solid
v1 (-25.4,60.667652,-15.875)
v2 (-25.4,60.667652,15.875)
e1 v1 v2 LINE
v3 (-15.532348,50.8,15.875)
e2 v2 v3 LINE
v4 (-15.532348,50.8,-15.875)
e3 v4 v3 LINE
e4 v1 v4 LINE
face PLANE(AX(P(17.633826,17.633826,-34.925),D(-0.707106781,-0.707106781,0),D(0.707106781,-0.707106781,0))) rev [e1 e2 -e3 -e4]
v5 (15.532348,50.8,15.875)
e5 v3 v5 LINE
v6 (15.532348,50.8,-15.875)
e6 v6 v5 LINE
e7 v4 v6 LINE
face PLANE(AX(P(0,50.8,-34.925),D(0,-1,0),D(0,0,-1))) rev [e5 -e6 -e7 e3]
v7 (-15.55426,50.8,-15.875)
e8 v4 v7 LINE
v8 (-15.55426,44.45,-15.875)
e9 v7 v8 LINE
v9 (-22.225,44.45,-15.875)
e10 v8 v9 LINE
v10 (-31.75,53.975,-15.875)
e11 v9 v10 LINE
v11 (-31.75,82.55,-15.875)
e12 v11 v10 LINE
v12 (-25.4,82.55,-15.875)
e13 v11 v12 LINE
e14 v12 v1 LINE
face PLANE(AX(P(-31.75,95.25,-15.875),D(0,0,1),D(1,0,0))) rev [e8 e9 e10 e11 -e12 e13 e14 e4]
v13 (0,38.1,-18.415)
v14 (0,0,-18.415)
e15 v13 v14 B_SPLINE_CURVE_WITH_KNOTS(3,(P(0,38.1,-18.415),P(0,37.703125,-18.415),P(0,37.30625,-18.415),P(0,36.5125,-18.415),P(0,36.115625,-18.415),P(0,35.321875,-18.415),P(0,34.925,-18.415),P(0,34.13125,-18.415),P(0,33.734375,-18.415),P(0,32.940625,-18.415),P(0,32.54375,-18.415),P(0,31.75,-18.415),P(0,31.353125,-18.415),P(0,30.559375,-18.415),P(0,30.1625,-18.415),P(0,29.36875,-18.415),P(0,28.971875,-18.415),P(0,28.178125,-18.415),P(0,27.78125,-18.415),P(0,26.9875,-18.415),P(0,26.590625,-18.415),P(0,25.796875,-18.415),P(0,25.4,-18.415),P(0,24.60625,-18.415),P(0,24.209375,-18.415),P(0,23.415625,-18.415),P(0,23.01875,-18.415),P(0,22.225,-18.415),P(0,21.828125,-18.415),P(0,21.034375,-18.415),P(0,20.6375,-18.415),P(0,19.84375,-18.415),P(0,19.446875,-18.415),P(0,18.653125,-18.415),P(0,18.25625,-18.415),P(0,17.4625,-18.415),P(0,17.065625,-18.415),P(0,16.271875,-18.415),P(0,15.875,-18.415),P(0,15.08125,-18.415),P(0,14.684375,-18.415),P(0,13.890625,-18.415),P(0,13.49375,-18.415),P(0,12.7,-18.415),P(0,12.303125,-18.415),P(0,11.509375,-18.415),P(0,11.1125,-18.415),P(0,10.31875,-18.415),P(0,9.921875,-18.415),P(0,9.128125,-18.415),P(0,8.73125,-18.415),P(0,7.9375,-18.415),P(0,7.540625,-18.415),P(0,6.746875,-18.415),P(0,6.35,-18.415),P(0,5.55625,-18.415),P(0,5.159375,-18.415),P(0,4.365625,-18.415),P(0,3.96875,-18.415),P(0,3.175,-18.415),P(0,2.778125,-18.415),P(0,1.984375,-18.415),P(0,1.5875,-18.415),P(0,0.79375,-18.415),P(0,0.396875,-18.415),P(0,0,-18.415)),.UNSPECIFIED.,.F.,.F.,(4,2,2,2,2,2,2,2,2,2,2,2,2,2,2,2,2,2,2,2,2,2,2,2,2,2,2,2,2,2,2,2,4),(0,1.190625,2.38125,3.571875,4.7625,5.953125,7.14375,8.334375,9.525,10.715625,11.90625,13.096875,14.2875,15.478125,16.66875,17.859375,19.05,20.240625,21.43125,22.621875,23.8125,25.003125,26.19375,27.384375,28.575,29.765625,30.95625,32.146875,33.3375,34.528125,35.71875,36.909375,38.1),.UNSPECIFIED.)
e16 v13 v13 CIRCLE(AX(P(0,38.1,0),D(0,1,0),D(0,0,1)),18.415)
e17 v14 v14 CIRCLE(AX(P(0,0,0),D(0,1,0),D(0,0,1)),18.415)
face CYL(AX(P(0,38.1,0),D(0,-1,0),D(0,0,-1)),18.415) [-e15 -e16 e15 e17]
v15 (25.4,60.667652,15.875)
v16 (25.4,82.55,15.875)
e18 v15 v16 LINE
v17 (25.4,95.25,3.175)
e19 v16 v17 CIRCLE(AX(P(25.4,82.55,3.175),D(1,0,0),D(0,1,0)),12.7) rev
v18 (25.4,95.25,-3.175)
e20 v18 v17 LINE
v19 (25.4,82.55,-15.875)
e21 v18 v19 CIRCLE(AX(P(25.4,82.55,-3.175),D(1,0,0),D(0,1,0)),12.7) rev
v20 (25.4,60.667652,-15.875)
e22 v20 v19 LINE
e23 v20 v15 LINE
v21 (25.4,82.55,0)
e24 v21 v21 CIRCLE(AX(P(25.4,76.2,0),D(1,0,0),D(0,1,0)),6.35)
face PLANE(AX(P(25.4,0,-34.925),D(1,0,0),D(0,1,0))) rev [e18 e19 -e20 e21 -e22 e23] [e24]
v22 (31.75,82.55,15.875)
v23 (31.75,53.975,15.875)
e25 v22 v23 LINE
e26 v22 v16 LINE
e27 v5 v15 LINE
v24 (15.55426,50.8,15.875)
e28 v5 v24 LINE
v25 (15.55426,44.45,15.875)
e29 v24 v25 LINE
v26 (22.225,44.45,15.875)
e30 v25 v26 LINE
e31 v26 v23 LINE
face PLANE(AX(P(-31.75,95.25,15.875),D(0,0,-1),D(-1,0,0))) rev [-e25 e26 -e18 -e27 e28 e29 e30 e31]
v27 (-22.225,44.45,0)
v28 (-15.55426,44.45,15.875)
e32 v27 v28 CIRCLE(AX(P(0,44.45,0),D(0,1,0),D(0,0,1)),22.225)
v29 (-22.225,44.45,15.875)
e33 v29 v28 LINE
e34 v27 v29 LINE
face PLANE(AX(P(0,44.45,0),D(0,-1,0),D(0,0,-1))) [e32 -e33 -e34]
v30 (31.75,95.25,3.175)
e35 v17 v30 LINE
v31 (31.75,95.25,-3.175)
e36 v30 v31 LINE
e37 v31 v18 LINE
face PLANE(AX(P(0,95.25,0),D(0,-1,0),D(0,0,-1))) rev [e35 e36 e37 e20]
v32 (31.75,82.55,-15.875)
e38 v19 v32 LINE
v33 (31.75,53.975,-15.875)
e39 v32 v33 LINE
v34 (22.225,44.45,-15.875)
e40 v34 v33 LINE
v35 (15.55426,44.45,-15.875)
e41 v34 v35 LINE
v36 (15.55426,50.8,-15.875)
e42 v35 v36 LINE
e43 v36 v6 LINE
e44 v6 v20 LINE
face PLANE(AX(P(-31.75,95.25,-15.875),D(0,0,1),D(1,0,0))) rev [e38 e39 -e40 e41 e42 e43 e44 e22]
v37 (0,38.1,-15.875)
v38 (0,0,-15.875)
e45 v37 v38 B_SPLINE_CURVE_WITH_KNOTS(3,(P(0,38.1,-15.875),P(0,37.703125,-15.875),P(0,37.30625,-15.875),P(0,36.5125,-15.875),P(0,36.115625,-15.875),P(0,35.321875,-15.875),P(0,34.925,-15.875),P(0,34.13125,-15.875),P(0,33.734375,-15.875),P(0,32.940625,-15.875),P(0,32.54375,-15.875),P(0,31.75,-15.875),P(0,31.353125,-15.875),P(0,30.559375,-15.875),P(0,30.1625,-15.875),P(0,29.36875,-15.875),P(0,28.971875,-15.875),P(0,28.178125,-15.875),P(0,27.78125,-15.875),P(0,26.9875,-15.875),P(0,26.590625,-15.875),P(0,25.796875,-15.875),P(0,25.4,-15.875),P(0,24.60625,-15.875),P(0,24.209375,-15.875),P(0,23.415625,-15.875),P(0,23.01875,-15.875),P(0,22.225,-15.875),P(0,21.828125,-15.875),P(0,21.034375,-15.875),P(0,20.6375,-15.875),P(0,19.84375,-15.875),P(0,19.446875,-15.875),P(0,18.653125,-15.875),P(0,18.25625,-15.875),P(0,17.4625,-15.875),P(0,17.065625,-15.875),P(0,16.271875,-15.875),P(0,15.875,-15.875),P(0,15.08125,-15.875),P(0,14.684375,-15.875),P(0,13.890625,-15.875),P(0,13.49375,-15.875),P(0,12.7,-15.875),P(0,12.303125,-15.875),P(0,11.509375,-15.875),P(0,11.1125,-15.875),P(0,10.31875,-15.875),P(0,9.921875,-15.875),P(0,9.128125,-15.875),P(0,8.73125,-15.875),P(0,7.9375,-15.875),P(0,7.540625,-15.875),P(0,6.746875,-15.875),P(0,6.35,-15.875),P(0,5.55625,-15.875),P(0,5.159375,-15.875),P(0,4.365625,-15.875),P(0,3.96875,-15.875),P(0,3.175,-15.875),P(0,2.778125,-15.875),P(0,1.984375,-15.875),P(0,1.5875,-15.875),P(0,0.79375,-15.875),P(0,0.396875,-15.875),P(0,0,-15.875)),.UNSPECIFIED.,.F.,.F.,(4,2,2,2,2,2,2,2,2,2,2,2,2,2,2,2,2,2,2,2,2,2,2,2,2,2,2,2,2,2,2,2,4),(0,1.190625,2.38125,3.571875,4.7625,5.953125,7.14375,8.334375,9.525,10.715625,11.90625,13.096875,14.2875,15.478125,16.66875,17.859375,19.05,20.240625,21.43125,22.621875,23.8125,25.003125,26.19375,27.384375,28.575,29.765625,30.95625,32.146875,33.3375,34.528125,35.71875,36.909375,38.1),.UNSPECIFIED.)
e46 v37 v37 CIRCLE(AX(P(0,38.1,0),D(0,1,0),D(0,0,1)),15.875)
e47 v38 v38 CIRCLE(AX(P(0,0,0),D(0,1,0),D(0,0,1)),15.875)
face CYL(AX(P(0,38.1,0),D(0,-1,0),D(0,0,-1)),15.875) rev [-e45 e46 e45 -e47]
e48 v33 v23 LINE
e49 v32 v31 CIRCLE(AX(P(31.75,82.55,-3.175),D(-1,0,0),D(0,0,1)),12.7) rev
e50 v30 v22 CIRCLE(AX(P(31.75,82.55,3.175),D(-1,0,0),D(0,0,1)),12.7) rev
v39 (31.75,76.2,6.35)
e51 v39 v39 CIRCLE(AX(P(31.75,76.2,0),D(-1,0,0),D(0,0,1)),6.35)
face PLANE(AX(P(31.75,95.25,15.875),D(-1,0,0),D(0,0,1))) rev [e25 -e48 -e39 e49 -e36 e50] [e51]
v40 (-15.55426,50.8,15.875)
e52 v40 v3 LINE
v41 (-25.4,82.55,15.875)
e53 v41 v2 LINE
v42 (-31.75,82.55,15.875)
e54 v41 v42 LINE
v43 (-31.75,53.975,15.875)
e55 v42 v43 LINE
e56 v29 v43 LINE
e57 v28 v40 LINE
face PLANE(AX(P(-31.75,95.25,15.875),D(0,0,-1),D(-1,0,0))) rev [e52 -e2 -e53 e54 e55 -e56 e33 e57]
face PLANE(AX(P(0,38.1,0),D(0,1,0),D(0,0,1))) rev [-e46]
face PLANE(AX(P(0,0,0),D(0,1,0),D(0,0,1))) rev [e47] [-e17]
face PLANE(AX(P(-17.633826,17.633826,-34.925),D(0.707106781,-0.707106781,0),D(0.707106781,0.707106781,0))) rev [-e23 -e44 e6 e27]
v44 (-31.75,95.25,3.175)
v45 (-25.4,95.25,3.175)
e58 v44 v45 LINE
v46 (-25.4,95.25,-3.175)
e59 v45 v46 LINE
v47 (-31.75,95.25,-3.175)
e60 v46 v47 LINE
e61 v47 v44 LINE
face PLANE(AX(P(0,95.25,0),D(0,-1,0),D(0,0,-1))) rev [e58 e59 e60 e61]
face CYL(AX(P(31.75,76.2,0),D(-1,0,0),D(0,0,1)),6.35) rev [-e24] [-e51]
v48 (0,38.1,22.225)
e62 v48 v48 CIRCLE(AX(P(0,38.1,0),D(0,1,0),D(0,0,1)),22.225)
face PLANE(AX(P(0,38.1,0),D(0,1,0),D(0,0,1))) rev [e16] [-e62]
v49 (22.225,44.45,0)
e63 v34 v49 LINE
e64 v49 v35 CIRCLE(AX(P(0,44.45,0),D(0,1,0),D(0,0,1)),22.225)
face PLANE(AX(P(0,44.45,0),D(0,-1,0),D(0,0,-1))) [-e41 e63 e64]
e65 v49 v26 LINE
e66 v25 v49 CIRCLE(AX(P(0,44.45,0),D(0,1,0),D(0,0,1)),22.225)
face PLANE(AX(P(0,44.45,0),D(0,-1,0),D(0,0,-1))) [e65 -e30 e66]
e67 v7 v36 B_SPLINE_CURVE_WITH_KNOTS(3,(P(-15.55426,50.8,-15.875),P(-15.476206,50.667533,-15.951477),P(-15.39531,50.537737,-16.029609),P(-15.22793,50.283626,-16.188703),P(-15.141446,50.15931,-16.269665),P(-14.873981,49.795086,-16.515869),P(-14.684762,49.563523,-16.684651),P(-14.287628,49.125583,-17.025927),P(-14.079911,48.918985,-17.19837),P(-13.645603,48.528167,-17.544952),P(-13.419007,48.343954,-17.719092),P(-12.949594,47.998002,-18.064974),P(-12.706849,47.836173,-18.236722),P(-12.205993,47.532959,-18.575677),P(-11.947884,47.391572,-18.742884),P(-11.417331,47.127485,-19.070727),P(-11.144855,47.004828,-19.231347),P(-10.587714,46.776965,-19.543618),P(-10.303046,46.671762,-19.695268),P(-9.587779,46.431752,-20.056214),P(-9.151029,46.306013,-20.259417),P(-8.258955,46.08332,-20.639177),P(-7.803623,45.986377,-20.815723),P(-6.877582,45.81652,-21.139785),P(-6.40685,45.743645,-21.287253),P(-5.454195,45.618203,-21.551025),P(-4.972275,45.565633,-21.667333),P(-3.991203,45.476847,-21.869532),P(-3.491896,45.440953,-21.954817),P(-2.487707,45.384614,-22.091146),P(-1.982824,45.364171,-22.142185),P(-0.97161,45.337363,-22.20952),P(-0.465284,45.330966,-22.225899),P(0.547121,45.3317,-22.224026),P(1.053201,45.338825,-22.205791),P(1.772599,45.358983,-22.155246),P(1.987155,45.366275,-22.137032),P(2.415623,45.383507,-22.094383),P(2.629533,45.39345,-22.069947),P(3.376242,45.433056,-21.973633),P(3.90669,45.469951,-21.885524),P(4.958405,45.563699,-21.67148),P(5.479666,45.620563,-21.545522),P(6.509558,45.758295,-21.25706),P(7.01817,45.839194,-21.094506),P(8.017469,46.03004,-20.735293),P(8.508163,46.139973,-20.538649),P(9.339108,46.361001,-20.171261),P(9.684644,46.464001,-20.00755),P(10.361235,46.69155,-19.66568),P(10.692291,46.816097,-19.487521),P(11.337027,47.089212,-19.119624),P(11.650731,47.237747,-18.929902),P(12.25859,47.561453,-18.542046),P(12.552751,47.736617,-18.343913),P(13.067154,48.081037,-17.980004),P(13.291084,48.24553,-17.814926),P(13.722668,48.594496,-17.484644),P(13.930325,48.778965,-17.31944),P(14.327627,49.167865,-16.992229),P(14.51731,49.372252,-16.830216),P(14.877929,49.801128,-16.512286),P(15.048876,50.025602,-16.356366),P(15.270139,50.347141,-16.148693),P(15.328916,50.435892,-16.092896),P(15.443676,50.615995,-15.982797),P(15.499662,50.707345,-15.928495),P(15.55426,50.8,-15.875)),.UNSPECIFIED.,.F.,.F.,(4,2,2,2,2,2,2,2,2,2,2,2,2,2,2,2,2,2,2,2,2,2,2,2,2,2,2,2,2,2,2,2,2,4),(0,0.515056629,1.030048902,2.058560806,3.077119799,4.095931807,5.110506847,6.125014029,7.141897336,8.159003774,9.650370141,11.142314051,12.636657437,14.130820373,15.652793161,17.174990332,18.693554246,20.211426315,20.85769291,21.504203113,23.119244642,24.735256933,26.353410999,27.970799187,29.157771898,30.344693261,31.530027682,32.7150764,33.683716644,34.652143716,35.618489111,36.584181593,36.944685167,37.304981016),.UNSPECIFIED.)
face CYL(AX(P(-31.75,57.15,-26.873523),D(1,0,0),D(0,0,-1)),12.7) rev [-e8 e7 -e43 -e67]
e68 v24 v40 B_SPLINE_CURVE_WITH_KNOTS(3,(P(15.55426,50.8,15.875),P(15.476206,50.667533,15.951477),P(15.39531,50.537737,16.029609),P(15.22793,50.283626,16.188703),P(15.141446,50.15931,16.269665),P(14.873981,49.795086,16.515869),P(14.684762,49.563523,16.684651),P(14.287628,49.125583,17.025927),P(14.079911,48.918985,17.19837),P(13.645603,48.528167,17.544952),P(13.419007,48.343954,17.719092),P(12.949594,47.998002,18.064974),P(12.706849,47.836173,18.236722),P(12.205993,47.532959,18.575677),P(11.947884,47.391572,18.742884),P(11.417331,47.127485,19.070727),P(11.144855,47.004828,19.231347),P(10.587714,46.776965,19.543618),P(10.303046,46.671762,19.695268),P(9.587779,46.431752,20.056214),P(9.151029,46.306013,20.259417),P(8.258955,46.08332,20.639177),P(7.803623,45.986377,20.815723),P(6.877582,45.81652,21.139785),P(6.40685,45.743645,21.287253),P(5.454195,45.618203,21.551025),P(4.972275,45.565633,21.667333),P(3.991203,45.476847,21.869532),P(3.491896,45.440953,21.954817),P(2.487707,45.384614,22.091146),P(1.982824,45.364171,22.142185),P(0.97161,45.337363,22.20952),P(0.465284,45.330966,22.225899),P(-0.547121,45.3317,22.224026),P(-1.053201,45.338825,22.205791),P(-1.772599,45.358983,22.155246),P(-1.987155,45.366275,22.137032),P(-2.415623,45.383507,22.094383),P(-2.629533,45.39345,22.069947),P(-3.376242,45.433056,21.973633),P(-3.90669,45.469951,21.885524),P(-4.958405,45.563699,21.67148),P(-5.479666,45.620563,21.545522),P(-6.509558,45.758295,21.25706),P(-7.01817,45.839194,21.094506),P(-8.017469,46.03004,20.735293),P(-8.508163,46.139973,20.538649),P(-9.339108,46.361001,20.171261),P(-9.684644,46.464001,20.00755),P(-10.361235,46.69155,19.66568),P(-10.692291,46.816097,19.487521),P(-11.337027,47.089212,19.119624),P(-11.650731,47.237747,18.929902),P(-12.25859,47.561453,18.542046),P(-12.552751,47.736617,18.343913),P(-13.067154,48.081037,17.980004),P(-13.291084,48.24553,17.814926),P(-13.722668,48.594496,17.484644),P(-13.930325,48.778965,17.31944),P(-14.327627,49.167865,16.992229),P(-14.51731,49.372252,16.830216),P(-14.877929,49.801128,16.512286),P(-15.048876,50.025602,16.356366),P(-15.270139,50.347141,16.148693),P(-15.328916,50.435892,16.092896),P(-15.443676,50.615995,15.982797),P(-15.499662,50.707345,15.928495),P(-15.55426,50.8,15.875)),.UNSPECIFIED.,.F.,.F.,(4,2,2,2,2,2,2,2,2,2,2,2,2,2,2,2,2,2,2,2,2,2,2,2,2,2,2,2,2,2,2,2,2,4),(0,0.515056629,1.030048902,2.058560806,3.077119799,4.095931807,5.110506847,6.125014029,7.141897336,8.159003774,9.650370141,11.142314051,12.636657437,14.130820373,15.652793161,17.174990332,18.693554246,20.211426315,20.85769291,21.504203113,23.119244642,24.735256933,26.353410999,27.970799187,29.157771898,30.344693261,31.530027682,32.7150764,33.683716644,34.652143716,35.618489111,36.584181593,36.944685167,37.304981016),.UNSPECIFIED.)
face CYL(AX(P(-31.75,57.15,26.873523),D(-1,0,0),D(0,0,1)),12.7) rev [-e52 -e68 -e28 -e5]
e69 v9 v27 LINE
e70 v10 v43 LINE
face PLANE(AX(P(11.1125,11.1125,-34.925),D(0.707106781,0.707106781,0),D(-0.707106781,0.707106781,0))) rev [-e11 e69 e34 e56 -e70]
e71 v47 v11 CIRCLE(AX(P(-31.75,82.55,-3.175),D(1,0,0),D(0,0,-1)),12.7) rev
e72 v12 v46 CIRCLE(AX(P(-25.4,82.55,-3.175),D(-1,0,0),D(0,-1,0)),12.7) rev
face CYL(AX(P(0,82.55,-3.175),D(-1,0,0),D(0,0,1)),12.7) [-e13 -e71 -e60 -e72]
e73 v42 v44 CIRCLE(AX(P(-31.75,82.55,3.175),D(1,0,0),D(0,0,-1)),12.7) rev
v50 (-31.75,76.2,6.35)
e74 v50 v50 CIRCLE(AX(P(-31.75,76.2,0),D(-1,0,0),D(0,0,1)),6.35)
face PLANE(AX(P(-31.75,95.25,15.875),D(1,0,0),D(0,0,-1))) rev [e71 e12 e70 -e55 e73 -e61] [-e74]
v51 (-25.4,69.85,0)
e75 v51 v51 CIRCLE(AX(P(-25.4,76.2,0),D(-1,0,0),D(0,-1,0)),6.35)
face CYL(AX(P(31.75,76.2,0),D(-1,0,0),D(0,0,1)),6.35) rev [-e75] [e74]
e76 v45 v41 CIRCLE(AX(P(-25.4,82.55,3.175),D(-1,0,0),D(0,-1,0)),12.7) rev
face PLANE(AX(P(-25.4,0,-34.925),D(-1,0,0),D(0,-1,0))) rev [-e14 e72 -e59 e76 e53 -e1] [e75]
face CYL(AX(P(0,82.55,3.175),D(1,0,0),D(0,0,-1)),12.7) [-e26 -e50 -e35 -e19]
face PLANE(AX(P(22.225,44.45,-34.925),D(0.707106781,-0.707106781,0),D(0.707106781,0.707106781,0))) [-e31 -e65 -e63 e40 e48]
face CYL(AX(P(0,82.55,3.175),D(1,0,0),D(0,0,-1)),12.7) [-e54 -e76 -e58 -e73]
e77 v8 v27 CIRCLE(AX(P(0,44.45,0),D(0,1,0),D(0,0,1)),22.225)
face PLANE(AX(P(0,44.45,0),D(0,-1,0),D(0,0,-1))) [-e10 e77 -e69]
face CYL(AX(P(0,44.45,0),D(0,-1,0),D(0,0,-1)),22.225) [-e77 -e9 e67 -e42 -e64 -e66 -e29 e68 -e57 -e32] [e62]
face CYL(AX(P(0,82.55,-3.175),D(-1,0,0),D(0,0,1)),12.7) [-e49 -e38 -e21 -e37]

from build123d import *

# Parameters (mm, degrees)
SKETCH2_R           = 18.415
SKETCH2_R_2         = 15.875
BOSS_EXTRUDE1_DEPTH = 38.1
SKETCH3_R           = 22.225
BOSS_EXTRUDE2_DEPTH = 6.35
SKETCH5_W           = 63.5
SKETCH5_H           = 31.75
BOSS_EXTRUDE3_DEPTH = 50.8
CUT_EXTRUDE2_DEPTH  = 50.8
FILLET1_R           = 12.7
SKETCH9_R           = 6.35
CUT_EXTRUDE3_DEPTH  = 117.613734719
FILLET2_R           = 12.7


with BuildPart() as part:
    # Sketch2 → Boss-Extrude1 (new body)
    with BuildSketch(Plane(origin=(0, 0, 0), x_dir=(1, 0, 0), z_dir=(0, 1, 0))):
        with Locations(Location((0, 0, 0), (0, 0, 90))):
            Circle(SKETCH2_R)
        with Locations(Location((0, 0, 0), (0, 0, 90))):
            Circle(SKETCH2_R_2, mode=Mode.SUBTRACT)
    extrude(amount=BOSS_EXTRUDE1_DEPTH)

    # Sketch3 → Boss-Extrude2 (add)
    with BuildSketch(Plane(origin=(0, 38.1, 0), x_dir=(1, 0, 0), z_dir=(0, 1, 0))):
        with Locations(Location((0, 0, 0), (0, 0, 270))):
            Circle(SKETCH3_R)
    extrude(amount=BOSS_EXTRUDE2_DEPTH)

    # Sketch5 → Boss-Extrude3 (add)
    with BuildSketch(Plane(origin=(0, 44.45, 0), x_dir=(1, 0, 0), z_dir=(0, 1, 0))):
        Rectangle(SKETCH5_W, SKETCH5_H)
    extrude(amount=BOSS_EXTRUDE3_DEPTH)

    # Sketch7 → Cut-Extrude2 (cut)
    with BuildSketch(Plane.XY.offset(15.875)):
        Polygon((25.4, 95.25), (-25.4, 95.25), (-25.4, 60.667652482), (-15.532347518, 50.8), (15.532347518, 50.8), (25.4, 60.667652482), align=None)
        Polygon((-22.225, 44.45), (-31.75, 53.975), (-31.75, 44.45), align=None)
        Polygon((22.225, 44.45), (31.75, 53.975), (31.75, 44.45), align=None)
    extrude(amount=-CUT_EXTRUDE2_DEPTH, mode=Mode.SUBTRACT)

    # Fillet1
    fillet1_edges = [part.edges().sort_by_distance(p)[0] for p in [
        (28.575, 95.25, -15.875),
        (-28.575, 95.25, 15.875),
        (-28.575, 95.25, -15.875),
        (28.575, 95.25, 15.875),
    ]]
    fillet(fillet1_edges, radius=FILLET1_R)

    # Sketch9 → Cut-Extrude3 (cut, through all)
    with BuildSketch(Plane.ZY.offset(31.75)):
        with Locations((0, 76.2)):
            Circle(SKETCH9_R)
    extrude(amount=-CUT_EXTRUDE3_DEPTH, mode=Mode.SUBTRACT)

    # Fillet2
    # the kernel refuses this fillet: 12.7 mm, written as the material it adds along each edge
    with BuildSketch(Plane(origin=(-43.050566437, 44.45, 15.875), x_dir=(0, 1, 0), z_dir=(1, 0, 0))) as fillet2_piece_1_section:
        with BuildLine():
            CenterArc((12.7, 10.998522628), FILLET2_R, 180, 60)
            Line((0, 10.998522628), (0, 0))
            Line((0, 0), (6.35, 0))
        make_face()
    fillet2_piece_1 = extrude(amount=86.101132874, mode=Mode.PRIVATE)
    fillet2_piece_1 = fillet2_piece_1 & Plane(origin=(0, 49.09130813, 0), x_dir=(0, 0, 1), z_dir=(0, -1, 0)) * Cylinder(22.225, 217, mode=Mode.PRIVATE)
    add(fillet2_piece_1)
    with BuildSketch(Plane(origin=(43.050566437, 44.45, -15.875), x_dir=(0, 1, 0), z_dir=(-1, 0, 0))) as fillet2_piece_2_section:
        with BuildLine():
            CenterArc((12.7, 10.998522628), FILLET2_R, 180, 60)
            Line((0, 10.998522628), (0, 0))
            Line((0, 0), (6.35, 0))
        make_face()
    fillet2_piece_2 = extrude(amount=86.101132874, mode=Mode.PRIVATE)
    fillet2_piece_2 = fillet2_piece_2 & Plane(origin=(0, 49.09130813, 0), x_dir=(0, 0, 1), z_dir=(0, -1, 0)) * Cylinder(22.225, 217, mode=Mode.PRIVATE)
    add(fillet2_piece_2)


solid = part.part
